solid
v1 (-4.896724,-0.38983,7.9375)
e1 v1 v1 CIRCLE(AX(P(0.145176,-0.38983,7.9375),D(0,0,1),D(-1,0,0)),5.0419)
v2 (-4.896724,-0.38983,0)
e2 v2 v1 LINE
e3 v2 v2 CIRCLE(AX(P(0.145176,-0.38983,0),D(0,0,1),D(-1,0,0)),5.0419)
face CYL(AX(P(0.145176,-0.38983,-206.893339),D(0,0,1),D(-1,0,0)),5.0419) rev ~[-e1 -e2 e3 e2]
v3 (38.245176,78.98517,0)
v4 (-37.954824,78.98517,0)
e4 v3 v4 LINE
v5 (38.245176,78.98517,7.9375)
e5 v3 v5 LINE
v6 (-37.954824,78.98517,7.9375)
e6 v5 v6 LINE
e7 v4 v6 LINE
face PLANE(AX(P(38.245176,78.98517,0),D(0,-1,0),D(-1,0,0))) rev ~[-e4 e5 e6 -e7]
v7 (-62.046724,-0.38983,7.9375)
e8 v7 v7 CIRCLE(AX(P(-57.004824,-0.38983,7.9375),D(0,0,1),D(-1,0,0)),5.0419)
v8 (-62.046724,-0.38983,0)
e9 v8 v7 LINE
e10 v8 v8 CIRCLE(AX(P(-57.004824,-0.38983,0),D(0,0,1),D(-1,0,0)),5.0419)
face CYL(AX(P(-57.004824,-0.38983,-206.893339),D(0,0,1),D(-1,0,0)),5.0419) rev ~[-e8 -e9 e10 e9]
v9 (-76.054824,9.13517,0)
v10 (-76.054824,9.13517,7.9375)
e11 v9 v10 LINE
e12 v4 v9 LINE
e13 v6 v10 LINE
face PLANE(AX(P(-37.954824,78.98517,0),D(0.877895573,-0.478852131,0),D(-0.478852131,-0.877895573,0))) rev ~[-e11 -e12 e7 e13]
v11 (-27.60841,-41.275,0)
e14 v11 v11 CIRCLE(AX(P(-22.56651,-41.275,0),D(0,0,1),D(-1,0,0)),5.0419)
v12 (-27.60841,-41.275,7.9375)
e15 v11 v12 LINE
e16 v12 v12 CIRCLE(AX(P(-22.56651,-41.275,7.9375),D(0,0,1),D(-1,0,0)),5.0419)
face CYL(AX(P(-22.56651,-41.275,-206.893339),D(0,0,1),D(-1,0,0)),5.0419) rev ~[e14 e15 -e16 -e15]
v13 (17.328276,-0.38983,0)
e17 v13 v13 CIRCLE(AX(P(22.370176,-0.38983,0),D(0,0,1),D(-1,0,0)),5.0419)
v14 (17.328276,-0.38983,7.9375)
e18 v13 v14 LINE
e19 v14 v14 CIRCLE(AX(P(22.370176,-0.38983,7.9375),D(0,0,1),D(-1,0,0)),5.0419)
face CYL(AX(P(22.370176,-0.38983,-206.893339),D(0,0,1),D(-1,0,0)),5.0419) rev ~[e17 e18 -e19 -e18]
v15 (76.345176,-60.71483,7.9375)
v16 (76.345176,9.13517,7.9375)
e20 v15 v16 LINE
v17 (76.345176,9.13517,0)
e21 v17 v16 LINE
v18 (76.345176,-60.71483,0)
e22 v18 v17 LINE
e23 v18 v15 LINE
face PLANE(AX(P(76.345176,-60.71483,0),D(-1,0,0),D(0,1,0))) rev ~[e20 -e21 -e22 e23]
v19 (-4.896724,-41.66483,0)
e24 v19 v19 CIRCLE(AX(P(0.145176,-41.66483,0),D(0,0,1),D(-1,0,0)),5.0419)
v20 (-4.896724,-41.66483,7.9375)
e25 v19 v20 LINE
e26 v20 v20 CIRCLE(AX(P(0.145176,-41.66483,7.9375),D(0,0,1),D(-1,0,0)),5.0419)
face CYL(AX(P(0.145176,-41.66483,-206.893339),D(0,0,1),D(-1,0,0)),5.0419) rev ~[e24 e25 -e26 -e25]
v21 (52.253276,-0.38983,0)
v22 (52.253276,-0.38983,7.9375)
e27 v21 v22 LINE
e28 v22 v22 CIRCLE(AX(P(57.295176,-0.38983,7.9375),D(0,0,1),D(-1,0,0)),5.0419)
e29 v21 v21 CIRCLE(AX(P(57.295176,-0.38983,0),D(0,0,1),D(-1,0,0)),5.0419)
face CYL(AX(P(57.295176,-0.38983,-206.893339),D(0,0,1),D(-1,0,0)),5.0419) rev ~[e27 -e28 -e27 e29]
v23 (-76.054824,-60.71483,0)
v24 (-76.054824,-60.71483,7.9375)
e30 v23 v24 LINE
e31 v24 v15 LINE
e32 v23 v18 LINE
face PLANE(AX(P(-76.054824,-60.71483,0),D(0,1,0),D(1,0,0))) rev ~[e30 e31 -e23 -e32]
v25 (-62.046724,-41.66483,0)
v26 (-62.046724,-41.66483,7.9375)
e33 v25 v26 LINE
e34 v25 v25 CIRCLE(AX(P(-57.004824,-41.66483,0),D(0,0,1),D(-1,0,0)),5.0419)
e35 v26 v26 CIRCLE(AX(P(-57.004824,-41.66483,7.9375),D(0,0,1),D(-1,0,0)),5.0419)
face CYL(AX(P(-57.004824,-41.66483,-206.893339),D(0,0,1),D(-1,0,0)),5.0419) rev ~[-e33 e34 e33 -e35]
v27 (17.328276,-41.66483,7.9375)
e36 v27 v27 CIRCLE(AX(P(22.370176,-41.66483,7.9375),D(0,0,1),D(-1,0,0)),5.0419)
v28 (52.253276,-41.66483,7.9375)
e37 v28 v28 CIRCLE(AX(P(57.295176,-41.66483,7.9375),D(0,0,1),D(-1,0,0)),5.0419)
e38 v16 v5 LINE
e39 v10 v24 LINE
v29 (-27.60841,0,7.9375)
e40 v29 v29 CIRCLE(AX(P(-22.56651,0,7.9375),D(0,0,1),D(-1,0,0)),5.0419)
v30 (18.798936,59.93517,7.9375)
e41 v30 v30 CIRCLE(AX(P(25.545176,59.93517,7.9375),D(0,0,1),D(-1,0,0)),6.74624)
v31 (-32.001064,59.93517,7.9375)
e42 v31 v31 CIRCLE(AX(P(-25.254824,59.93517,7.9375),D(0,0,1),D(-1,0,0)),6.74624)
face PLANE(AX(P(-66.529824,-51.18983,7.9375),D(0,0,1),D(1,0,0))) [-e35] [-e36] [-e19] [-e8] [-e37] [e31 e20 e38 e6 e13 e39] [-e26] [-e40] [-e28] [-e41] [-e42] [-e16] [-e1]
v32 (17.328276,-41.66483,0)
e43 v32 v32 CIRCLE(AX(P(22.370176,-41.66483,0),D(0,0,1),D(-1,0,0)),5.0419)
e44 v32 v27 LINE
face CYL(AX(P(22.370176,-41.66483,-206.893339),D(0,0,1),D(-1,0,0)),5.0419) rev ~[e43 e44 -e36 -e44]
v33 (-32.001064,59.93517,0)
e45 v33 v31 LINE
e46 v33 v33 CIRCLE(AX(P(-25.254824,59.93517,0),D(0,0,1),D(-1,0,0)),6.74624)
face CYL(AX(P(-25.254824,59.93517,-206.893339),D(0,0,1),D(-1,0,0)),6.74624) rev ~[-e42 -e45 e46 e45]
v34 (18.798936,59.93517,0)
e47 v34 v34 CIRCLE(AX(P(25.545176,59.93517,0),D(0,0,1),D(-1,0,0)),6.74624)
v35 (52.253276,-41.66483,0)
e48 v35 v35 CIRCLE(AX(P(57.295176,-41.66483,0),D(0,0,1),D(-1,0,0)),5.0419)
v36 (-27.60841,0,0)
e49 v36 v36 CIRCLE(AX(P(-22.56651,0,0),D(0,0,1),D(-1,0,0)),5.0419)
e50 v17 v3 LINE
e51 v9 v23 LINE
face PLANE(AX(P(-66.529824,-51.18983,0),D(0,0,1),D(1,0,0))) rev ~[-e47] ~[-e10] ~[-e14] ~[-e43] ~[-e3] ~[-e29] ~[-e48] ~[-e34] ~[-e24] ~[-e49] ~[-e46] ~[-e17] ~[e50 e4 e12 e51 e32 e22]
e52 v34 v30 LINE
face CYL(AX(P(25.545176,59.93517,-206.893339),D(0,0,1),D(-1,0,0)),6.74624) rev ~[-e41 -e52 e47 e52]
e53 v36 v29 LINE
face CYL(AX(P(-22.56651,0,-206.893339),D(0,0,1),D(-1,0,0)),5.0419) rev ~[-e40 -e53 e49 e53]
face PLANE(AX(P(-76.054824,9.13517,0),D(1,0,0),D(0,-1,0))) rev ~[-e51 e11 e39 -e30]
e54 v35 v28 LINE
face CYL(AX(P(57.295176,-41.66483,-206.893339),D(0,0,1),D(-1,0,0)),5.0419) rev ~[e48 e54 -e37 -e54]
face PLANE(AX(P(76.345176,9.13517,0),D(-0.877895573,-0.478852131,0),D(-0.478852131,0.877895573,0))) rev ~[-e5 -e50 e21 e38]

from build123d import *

# Parameters (mm, degrees)
F0_W     = 19.05
F0_H     = 19.05
F0_W_2   = 12.7
F1_DEPTH = 7.9375
F2_D     = 10.0838
F3_D     = 13.49248


# Not quite as in the source:
# - a feature names something its author has since deleted; it is built from what else it names


with BuildPart() as f1:
    # F0 (on Top) → F1 (new body)
    with BuildSketch(Plane.XY):
        with Locations((-66.5298237595, -51.1898304701)):
            Rectangle(F0_W, F0_H)
        Polygon((-57.0048237595, -41.6648304701), (-57.0048237595, -60.7148304701), (-37.9548237595, -60.7148304701), (-37.9548237595, 9.1351695299), (-76.0548237595, 9.1351695299), (-76.0548237595, -41.6648304701), align=None)
        Polygon((-37.9548237595, 9.1351695299), (-37.9548237595, -60.7148304701), (0.1451762405, -60.7148304701), (0.1451762405, -41.6648304701), (0.1451762405, -0.3898304701), (22.3701762405, -0.3898304701), (22.3701762405, -41.6648304701), (22.3701762405, -60.7148304701), (38.2451762405, -60.7148304701), (38.2451762405, 9.1351695299), align=None)
        Polygon((-37.9548237595, 78.9851695299), (-76.0548237595, 9.1351695299), (-37.9548237595, 9.1351695299), (-37.9548237595, 59.9351695299), align=None)
        Polygon((0.1451762405, -41.6648304701), (0.1451762405, -60.7148304701), (22.3701762405, -60.7148304701), (22.3701762405, -41.6648304701), (22.3701762405, -0.3898304701), (0.1451762405, -0.3898304701), align=None)
        Polygon((-37.9548237595, 59.9351695299), (-37.9548237595, 9.1351695299), (38.2451762405, 9.1351695299), (38.2451762405, 59.9351695299), (25.5451762405, 59.9351695299), (25.5451762405, 78.9851695299), (-25.2548237595, 78.9851695299), (-25.2548237595, 59.9351695299), align=None)
        with Locations((-31.6048237595, 69.4601695299)):
            Rectangle(F0_W_2, F0_H)
        Polygon((38.2451762405, 59.9351695299), (38.2451762405, 9.1351695299), (76.3451762405, 9.1351695299), (38.2451762405, 78.9851695299), align=None)
        Polygon((76.3451762405, 9.1351695299), (38.2451762405, 9.1351695299), (38.2451762405, -60.7148304701), (57.2951762405, -60.7148304701), (76.3451762405, -60.7148304701), align=None)
        with Locations((31.8951762405, 69.4601695299)):
            Rectangle(F0_W_2, F0_H)
    extrude(amount=F1_DEPTH)

    # F2 (through all)
    with Locations(Plane(origin=(0, 0, 0), x_dir=(1, 0, 0), z_dir=(0, 0, -1))):
        with Locations((-57.0048237595, 0.3898304701), (-57.0048237595, 41.6648304701), (0.1451762405, 0.3898304701), (0.1451762405, 41.6648304701), (57.2951762405, 0.3898304701), (57.2951762405, 41.6648304701), (-22.5665104002, 0), (-22.5665104002, 41.275), (22.3701762405, 41.6648304701), (22.3701762405, 0.3898304701)):
            Hole(F2_D / 2)

    # F3 (through all)
    with Locations(Plane(origin=(0, 0, 0), x_dir=(1, 0, 0), z_dir=(0, 0, -1))):
        with Locations((-25.2548237595, -59.9351695299), (25.5451762405, -59.9351695299)):
            Hole(F3_D / 2)


solid = f1.part
